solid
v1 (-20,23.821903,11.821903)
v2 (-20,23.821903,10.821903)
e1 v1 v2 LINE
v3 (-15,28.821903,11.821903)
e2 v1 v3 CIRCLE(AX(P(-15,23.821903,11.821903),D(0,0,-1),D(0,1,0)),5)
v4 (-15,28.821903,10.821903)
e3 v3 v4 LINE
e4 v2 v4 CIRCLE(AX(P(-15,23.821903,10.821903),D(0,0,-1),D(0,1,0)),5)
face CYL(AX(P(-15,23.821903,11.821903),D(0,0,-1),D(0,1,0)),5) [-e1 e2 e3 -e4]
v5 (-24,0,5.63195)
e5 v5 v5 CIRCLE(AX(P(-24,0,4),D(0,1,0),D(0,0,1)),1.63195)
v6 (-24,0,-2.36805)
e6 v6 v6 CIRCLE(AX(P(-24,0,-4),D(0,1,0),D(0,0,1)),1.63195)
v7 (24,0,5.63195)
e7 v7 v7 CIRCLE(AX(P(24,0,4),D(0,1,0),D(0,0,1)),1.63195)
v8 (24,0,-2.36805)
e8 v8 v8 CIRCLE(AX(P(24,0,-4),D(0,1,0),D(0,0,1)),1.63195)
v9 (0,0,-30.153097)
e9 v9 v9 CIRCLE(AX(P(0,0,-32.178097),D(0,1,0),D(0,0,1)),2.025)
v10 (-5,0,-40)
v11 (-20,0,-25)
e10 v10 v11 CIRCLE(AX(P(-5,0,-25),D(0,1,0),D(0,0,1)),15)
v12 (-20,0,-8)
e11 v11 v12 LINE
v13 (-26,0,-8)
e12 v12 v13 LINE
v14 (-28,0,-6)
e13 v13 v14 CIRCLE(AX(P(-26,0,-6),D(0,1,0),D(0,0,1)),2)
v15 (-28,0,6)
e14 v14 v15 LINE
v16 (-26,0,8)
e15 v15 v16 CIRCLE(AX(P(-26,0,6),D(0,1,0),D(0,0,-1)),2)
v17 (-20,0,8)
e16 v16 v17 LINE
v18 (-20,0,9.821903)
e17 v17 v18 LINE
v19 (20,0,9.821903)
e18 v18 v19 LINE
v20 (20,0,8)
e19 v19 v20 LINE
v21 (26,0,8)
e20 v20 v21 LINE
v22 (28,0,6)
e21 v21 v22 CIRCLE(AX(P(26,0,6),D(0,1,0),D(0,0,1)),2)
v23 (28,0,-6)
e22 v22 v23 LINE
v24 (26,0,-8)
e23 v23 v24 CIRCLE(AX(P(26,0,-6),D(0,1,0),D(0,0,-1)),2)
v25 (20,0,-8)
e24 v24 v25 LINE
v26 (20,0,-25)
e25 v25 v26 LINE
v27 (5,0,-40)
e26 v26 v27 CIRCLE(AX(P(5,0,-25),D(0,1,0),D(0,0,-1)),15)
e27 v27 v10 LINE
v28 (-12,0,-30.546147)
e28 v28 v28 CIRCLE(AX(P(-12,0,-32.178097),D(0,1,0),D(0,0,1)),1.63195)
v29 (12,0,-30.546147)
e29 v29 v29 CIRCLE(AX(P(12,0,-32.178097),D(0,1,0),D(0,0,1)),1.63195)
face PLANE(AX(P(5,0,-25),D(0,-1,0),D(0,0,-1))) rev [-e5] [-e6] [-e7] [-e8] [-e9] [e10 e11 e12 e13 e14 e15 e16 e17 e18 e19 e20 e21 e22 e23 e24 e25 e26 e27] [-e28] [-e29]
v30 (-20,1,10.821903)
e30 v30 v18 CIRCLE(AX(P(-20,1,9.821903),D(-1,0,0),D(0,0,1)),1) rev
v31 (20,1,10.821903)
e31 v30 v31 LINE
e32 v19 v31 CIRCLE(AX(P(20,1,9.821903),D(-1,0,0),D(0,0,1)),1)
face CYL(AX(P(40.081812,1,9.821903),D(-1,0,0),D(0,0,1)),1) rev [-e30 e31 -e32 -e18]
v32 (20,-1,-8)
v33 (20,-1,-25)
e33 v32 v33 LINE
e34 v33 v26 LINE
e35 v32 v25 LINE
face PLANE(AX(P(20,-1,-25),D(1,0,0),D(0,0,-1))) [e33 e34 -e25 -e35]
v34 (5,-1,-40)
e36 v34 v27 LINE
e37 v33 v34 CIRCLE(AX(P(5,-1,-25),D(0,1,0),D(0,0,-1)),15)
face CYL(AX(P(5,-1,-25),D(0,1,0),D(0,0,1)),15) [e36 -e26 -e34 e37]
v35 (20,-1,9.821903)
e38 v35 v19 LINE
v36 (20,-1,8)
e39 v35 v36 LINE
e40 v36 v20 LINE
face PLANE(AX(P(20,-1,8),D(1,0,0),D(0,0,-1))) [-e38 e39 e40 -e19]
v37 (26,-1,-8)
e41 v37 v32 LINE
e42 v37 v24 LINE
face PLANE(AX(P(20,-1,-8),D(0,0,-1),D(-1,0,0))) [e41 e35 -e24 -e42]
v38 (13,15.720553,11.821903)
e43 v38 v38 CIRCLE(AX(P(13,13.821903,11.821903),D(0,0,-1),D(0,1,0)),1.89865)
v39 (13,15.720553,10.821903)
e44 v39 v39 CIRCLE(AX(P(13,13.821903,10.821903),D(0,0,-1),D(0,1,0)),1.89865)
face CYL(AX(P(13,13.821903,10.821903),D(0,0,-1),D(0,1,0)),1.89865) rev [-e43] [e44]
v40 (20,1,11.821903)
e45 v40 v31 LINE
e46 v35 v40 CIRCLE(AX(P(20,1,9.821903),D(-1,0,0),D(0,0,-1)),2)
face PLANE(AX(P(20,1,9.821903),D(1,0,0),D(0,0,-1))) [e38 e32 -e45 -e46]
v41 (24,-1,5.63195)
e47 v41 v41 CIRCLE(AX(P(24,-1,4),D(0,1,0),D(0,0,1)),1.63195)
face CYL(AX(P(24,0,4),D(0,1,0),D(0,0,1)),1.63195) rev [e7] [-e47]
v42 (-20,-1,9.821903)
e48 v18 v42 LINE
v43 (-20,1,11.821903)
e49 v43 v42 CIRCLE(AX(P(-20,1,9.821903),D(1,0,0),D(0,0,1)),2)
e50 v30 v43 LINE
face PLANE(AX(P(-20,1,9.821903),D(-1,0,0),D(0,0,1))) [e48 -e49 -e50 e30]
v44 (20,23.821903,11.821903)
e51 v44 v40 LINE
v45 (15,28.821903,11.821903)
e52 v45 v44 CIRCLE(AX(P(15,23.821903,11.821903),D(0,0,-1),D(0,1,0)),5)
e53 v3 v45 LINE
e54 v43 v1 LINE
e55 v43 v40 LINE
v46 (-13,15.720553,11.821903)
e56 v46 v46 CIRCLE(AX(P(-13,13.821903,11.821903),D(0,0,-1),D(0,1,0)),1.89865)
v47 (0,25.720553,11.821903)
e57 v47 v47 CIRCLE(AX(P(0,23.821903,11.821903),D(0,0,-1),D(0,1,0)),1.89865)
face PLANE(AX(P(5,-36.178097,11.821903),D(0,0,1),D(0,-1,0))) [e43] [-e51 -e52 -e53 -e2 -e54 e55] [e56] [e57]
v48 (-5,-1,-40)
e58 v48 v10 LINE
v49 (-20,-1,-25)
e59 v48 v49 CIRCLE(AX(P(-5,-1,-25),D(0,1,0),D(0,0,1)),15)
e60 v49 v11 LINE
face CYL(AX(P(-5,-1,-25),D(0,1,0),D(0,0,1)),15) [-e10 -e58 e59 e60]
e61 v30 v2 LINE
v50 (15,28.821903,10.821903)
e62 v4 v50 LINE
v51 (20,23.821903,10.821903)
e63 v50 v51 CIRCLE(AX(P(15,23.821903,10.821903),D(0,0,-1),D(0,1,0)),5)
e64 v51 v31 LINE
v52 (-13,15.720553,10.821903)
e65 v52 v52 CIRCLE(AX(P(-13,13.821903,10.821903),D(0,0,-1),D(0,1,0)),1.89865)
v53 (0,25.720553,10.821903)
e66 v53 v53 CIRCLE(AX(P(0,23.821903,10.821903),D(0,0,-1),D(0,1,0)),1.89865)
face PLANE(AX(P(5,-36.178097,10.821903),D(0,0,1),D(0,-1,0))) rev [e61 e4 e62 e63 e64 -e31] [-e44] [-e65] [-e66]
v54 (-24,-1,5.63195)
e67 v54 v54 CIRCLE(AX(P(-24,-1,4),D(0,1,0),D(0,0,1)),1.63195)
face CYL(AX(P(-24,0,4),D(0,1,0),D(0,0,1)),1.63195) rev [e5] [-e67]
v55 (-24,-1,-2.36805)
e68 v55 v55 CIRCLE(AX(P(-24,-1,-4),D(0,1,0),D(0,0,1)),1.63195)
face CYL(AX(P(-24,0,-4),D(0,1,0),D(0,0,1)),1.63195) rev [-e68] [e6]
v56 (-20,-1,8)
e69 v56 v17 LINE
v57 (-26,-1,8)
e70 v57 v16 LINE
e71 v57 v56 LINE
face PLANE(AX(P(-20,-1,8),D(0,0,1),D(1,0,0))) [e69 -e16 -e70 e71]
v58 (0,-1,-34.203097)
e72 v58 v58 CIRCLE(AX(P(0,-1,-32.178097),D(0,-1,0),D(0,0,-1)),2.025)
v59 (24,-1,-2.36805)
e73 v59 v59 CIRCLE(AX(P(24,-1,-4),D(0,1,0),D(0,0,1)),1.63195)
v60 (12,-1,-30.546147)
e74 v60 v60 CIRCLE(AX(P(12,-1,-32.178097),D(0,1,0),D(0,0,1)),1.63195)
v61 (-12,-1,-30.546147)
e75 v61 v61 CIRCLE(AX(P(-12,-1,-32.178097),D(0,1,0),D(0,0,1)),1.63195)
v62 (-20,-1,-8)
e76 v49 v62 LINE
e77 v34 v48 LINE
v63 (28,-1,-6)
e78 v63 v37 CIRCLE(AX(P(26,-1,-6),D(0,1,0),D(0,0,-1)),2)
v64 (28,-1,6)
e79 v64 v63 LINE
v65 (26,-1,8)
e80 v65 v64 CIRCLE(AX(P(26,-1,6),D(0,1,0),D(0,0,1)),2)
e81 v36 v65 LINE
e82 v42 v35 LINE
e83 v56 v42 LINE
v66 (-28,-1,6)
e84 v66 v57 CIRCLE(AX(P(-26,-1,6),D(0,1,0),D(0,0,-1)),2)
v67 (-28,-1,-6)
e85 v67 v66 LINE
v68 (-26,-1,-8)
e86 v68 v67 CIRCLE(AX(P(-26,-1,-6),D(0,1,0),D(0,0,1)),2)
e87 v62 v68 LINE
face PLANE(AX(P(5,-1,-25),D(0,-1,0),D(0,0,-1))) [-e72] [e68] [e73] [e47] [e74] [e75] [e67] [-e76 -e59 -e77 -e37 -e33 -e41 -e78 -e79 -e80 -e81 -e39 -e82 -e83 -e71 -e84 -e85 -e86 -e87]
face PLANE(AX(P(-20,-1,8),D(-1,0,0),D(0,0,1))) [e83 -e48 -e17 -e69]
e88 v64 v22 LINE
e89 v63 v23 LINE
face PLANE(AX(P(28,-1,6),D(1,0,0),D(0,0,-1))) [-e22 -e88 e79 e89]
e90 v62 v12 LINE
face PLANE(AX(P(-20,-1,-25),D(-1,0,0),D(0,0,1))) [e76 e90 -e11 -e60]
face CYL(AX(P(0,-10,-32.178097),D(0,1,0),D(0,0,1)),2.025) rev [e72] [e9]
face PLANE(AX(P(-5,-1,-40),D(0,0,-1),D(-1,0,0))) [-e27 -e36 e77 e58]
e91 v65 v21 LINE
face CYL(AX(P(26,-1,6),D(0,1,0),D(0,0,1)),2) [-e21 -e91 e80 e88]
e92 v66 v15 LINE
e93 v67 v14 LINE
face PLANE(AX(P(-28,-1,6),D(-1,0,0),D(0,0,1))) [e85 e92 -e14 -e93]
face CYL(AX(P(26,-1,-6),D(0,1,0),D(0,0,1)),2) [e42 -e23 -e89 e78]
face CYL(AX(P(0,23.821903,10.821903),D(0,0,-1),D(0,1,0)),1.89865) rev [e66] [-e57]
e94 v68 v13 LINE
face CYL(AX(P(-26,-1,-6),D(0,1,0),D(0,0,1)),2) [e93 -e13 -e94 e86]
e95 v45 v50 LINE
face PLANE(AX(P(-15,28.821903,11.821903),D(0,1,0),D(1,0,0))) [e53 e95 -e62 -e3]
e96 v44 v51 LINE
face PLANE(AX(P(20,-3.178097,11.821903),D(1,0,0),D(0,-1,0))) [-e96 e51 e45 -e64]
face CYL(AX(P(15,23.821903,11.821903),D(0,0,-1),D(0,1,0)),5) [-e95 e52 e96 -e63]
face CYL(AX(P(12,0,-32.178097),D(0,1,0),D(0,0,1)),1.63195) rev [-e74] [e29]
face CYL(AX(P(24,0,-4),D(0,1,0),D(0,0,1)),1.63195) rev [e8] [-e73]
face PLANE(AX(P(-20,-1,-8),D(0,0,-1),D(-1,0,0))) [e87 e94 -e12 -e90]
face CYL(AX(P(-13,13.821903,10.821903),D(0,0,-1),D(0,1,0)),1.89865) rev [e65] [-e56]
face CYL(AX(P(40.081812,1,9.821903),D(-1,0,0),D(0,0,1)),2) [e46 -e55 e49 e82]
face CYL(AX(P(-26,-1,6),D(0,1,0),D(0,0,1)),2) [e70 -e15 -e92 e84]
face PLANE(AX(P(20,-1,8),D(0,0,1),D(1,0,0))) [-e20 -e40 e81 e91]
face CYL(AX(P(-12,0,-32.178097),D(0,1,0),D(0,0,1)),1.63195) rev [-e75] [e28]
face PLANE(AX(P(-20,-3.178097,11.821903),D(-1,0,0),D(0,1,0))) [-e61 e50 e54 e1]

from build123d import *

# Parameters (mm, degrees)
BASE_FLANGE1_DEPTH       = 1
SKETCHED_START           = 11.616422755
SKETCHED_BEND1_OUTLINE_W = 40
SKETCHED_BEND1_OUTLINE_H = 1
SKETCHED_BEND1_DEPTH     = 28.383577245
SKETCHED_START_2         = 10.821902755
SKETCHED_BEND1_2_DEPTH   = 0.00548
SKETCHED_START_3         = 9.821902755
SKETCHED_BEND1_3_DEPTH   = 2
SKETCHED_START_4         = -20
SKETCHED_BEND1_4_DEPTH   = 40
SKETCH7_R                = 2.025
CUT_EXTRUDE1_DEPTH       = 10
F_6_CLEARANCE_HOLE1_D    = 3.7973
F_4_CLEARANCE_HOLE2_D    = 3.2639


with BuildPart() as part:
    # Base-Flange1: sheet metal written as solids
    # Sketch1 → Base-Flange1 (new body)
    with BuildSketch(Plane(origin=(0, 0, 0), x_dir=(1, 0, 0), z_dir=(0, 1, 0))):
        with BuildLine():
            Line((-20, -8), (-20, -35))
            ThreePointArc((-20, -35), (-18.535533906, -38.535533906), (-15, -40))
            Line((-15, -40), (15, -40))
            ThreePointArc((15, -40), (18.535533906, -38.535533906), (20, -35))
            Line((20, -35), (20, -8))
            Line((20, -8), (26, -8))
            ThreePointArc((26, -8), (27.414213562, -7.414213562), (28, -6))
            Line((28, -6), (28, 6))
            ThreePointArc((28, 6), (27.414213562, 7.414213562), (26, 8))
            Line((26, 8), (20, 8))
            Line((20, 8), (20, 25))
            ThreePointArc((20, 25), (15.606601718, 35.606601718), (5, 40))
            Line((5, 40), (-5, 40))
            ThreePointArc((-5, 40), (-15.606601718, 35.606601718), (-20, 25))
            Line((-20, 25), (-20, 8))
            Line((-20, 8), (-26, 8))
            ThreePointArc((-26, 8), (-27.414213562, 7.414213562), (-28, 6))
            Line((-28, 6), (-28, -6))
            ThreePointArc((-28, -6), (-27.414213562, -7.414213562), (-26, -8))
            Line((-26, -8), (-20, -8))
        make_face()
    extrude(amount=-BASE_FLANGE1_DEPTH)

    # Sketched Bend1: read off the stored shape, not the designer's step
    # Sketched Bend1 outline → Sketched Bend1 (cut)
    with BuildSketch(Plane.XY.offset(SKETCHED_START)):
        with Locations((0, -0.5)):
            Rectangle(SKETCHED_BEND1_OUTLINE_W, SKETCHED_BEND1_OUTLINE_H)
    extrude(amount=SKETCHED_BEND1_DEPTH, mode=Mode.SUBTRACT)

    # Sketched Bend1 2 outline → Sketched Bend1 2 (add)
    with BuildSketch(Plane.XY.offset(SKETCHED_START_2)):
        with BuildLine():
            Line((20, 0), (20, 23.821902755))
            ThreePointArc((20, 23.821902755), (18.535533906, 27.357436661), (15, 28.821902755))
            Line((15, 28.821902755), (-15, 28.821902755))
            ThreePointArc((-15, 28.821902755), (-18.535533906, 27.357436661), (-20, 23.821902755))
            Line((-20, 23.821902755), (-20, 0))
            Line((-20, 0), (20, 0))
        make_face()
    extrude(amount=SKETCHED_BEND1_2_DEPTH)

    # Sketched Bend1 3 outline → Sketched Bend1 3 (add)
    with BuildSketch(Plane.XY.offset(SKETCHED_START_3)):
        with BuildLine():
            Line((20, 0), (20, 23.821902755))
            ThreePointArc((20, 23.821902755), (18.535533906, 27.357436661), (15, 28.821902755))
            Line((15, 28.821902755), (-15, 28.821902755))
            ThreePointArc((-15, 28.821902755), (-18.535533906, 27.357436661), (-20, 23.821902755))
            Line((-20, 23.821902755), (-20, 0))
            Line((-20, 0), (20, 0))
        make_face()
    extrude(amount=SKETCHED_BEND1_3_DEPTH)

    # Sketched Bend1 4 outline → Sketched Bend1 4 (cut)
    with BuildSketch(Plane.YZ.offset(SKETCHED_START_4)):
        with BuildLine():
            Line((28.821902755, 9.821902755), (28.821902755, 10.821902755))
            Line((28.821902755, 10.821902755), (1, 10.821902755))
            ThreePointArc((1, 10.821902755), (0.292893219, 10.529009536), (0, 9.821902755))
            Line((0, 9.821902755), (28.821902755, 9.821902755))
        make_face()
        with BuildLine():
            ThreePointArc((-1, 9.821902755), (-0.414213562, 11.236116317), (1, 11.821902755))
            Line((1, 11.821902755), (0, 11.821902755))
            Line((0, 11.821902755), (0, 11.616422755))
            Line((0, 11.616422755), (-1, 11.616422755))
            Line((-1, 11.616422755), (-1, 9.821902755))
        make_face()
    extrude(amount=SKETCHED_BEND1_4_DEPTH, mode=Mode.SUBTRACT)

    # Sketch7 → Cut-Extrude1 (cut)
    with BuildSketch(Plane(origin=(0, 0, 0), x_dir=(1, 0, 0), z_dir=(0, 1, 0))):
        with Locations(Location((0, 32.178097245, 0), (0, 0, 270))):
            Circle(SKETCH7_R)
    extrude(amount=-CUT_EXTRUDE1_DEPTH, mode=Mode.SUBTRACT)

    # #6 Clearance Hole1 (through all)
    with Locations(Plane(origin=(0, 0, 10.821902755), x_dir=(-1, 0, 0), z_dir=(0, 0, -1))):
        with Locations((13, 13.821902755), (-13, 13.821902755), (0, 23.821902755)):
            Hole(F_6_CLEARANCE_HOLE1_D / 2)

    # #4 Clearance Hole2 (through all)
    with Locations(Plane(origin=(0, 0, 0), x_dir=(1, 0, 0), z_dir=(0, 1, 0))):
        with Locations((-24, 4), (-24, -4), (24, 4), (24, -4), (-12, 32.178097245), (12, 32.178097245)):
            Hole(F_4_CLEARANCE_HOLE2_D / 2)


solid = part.part
